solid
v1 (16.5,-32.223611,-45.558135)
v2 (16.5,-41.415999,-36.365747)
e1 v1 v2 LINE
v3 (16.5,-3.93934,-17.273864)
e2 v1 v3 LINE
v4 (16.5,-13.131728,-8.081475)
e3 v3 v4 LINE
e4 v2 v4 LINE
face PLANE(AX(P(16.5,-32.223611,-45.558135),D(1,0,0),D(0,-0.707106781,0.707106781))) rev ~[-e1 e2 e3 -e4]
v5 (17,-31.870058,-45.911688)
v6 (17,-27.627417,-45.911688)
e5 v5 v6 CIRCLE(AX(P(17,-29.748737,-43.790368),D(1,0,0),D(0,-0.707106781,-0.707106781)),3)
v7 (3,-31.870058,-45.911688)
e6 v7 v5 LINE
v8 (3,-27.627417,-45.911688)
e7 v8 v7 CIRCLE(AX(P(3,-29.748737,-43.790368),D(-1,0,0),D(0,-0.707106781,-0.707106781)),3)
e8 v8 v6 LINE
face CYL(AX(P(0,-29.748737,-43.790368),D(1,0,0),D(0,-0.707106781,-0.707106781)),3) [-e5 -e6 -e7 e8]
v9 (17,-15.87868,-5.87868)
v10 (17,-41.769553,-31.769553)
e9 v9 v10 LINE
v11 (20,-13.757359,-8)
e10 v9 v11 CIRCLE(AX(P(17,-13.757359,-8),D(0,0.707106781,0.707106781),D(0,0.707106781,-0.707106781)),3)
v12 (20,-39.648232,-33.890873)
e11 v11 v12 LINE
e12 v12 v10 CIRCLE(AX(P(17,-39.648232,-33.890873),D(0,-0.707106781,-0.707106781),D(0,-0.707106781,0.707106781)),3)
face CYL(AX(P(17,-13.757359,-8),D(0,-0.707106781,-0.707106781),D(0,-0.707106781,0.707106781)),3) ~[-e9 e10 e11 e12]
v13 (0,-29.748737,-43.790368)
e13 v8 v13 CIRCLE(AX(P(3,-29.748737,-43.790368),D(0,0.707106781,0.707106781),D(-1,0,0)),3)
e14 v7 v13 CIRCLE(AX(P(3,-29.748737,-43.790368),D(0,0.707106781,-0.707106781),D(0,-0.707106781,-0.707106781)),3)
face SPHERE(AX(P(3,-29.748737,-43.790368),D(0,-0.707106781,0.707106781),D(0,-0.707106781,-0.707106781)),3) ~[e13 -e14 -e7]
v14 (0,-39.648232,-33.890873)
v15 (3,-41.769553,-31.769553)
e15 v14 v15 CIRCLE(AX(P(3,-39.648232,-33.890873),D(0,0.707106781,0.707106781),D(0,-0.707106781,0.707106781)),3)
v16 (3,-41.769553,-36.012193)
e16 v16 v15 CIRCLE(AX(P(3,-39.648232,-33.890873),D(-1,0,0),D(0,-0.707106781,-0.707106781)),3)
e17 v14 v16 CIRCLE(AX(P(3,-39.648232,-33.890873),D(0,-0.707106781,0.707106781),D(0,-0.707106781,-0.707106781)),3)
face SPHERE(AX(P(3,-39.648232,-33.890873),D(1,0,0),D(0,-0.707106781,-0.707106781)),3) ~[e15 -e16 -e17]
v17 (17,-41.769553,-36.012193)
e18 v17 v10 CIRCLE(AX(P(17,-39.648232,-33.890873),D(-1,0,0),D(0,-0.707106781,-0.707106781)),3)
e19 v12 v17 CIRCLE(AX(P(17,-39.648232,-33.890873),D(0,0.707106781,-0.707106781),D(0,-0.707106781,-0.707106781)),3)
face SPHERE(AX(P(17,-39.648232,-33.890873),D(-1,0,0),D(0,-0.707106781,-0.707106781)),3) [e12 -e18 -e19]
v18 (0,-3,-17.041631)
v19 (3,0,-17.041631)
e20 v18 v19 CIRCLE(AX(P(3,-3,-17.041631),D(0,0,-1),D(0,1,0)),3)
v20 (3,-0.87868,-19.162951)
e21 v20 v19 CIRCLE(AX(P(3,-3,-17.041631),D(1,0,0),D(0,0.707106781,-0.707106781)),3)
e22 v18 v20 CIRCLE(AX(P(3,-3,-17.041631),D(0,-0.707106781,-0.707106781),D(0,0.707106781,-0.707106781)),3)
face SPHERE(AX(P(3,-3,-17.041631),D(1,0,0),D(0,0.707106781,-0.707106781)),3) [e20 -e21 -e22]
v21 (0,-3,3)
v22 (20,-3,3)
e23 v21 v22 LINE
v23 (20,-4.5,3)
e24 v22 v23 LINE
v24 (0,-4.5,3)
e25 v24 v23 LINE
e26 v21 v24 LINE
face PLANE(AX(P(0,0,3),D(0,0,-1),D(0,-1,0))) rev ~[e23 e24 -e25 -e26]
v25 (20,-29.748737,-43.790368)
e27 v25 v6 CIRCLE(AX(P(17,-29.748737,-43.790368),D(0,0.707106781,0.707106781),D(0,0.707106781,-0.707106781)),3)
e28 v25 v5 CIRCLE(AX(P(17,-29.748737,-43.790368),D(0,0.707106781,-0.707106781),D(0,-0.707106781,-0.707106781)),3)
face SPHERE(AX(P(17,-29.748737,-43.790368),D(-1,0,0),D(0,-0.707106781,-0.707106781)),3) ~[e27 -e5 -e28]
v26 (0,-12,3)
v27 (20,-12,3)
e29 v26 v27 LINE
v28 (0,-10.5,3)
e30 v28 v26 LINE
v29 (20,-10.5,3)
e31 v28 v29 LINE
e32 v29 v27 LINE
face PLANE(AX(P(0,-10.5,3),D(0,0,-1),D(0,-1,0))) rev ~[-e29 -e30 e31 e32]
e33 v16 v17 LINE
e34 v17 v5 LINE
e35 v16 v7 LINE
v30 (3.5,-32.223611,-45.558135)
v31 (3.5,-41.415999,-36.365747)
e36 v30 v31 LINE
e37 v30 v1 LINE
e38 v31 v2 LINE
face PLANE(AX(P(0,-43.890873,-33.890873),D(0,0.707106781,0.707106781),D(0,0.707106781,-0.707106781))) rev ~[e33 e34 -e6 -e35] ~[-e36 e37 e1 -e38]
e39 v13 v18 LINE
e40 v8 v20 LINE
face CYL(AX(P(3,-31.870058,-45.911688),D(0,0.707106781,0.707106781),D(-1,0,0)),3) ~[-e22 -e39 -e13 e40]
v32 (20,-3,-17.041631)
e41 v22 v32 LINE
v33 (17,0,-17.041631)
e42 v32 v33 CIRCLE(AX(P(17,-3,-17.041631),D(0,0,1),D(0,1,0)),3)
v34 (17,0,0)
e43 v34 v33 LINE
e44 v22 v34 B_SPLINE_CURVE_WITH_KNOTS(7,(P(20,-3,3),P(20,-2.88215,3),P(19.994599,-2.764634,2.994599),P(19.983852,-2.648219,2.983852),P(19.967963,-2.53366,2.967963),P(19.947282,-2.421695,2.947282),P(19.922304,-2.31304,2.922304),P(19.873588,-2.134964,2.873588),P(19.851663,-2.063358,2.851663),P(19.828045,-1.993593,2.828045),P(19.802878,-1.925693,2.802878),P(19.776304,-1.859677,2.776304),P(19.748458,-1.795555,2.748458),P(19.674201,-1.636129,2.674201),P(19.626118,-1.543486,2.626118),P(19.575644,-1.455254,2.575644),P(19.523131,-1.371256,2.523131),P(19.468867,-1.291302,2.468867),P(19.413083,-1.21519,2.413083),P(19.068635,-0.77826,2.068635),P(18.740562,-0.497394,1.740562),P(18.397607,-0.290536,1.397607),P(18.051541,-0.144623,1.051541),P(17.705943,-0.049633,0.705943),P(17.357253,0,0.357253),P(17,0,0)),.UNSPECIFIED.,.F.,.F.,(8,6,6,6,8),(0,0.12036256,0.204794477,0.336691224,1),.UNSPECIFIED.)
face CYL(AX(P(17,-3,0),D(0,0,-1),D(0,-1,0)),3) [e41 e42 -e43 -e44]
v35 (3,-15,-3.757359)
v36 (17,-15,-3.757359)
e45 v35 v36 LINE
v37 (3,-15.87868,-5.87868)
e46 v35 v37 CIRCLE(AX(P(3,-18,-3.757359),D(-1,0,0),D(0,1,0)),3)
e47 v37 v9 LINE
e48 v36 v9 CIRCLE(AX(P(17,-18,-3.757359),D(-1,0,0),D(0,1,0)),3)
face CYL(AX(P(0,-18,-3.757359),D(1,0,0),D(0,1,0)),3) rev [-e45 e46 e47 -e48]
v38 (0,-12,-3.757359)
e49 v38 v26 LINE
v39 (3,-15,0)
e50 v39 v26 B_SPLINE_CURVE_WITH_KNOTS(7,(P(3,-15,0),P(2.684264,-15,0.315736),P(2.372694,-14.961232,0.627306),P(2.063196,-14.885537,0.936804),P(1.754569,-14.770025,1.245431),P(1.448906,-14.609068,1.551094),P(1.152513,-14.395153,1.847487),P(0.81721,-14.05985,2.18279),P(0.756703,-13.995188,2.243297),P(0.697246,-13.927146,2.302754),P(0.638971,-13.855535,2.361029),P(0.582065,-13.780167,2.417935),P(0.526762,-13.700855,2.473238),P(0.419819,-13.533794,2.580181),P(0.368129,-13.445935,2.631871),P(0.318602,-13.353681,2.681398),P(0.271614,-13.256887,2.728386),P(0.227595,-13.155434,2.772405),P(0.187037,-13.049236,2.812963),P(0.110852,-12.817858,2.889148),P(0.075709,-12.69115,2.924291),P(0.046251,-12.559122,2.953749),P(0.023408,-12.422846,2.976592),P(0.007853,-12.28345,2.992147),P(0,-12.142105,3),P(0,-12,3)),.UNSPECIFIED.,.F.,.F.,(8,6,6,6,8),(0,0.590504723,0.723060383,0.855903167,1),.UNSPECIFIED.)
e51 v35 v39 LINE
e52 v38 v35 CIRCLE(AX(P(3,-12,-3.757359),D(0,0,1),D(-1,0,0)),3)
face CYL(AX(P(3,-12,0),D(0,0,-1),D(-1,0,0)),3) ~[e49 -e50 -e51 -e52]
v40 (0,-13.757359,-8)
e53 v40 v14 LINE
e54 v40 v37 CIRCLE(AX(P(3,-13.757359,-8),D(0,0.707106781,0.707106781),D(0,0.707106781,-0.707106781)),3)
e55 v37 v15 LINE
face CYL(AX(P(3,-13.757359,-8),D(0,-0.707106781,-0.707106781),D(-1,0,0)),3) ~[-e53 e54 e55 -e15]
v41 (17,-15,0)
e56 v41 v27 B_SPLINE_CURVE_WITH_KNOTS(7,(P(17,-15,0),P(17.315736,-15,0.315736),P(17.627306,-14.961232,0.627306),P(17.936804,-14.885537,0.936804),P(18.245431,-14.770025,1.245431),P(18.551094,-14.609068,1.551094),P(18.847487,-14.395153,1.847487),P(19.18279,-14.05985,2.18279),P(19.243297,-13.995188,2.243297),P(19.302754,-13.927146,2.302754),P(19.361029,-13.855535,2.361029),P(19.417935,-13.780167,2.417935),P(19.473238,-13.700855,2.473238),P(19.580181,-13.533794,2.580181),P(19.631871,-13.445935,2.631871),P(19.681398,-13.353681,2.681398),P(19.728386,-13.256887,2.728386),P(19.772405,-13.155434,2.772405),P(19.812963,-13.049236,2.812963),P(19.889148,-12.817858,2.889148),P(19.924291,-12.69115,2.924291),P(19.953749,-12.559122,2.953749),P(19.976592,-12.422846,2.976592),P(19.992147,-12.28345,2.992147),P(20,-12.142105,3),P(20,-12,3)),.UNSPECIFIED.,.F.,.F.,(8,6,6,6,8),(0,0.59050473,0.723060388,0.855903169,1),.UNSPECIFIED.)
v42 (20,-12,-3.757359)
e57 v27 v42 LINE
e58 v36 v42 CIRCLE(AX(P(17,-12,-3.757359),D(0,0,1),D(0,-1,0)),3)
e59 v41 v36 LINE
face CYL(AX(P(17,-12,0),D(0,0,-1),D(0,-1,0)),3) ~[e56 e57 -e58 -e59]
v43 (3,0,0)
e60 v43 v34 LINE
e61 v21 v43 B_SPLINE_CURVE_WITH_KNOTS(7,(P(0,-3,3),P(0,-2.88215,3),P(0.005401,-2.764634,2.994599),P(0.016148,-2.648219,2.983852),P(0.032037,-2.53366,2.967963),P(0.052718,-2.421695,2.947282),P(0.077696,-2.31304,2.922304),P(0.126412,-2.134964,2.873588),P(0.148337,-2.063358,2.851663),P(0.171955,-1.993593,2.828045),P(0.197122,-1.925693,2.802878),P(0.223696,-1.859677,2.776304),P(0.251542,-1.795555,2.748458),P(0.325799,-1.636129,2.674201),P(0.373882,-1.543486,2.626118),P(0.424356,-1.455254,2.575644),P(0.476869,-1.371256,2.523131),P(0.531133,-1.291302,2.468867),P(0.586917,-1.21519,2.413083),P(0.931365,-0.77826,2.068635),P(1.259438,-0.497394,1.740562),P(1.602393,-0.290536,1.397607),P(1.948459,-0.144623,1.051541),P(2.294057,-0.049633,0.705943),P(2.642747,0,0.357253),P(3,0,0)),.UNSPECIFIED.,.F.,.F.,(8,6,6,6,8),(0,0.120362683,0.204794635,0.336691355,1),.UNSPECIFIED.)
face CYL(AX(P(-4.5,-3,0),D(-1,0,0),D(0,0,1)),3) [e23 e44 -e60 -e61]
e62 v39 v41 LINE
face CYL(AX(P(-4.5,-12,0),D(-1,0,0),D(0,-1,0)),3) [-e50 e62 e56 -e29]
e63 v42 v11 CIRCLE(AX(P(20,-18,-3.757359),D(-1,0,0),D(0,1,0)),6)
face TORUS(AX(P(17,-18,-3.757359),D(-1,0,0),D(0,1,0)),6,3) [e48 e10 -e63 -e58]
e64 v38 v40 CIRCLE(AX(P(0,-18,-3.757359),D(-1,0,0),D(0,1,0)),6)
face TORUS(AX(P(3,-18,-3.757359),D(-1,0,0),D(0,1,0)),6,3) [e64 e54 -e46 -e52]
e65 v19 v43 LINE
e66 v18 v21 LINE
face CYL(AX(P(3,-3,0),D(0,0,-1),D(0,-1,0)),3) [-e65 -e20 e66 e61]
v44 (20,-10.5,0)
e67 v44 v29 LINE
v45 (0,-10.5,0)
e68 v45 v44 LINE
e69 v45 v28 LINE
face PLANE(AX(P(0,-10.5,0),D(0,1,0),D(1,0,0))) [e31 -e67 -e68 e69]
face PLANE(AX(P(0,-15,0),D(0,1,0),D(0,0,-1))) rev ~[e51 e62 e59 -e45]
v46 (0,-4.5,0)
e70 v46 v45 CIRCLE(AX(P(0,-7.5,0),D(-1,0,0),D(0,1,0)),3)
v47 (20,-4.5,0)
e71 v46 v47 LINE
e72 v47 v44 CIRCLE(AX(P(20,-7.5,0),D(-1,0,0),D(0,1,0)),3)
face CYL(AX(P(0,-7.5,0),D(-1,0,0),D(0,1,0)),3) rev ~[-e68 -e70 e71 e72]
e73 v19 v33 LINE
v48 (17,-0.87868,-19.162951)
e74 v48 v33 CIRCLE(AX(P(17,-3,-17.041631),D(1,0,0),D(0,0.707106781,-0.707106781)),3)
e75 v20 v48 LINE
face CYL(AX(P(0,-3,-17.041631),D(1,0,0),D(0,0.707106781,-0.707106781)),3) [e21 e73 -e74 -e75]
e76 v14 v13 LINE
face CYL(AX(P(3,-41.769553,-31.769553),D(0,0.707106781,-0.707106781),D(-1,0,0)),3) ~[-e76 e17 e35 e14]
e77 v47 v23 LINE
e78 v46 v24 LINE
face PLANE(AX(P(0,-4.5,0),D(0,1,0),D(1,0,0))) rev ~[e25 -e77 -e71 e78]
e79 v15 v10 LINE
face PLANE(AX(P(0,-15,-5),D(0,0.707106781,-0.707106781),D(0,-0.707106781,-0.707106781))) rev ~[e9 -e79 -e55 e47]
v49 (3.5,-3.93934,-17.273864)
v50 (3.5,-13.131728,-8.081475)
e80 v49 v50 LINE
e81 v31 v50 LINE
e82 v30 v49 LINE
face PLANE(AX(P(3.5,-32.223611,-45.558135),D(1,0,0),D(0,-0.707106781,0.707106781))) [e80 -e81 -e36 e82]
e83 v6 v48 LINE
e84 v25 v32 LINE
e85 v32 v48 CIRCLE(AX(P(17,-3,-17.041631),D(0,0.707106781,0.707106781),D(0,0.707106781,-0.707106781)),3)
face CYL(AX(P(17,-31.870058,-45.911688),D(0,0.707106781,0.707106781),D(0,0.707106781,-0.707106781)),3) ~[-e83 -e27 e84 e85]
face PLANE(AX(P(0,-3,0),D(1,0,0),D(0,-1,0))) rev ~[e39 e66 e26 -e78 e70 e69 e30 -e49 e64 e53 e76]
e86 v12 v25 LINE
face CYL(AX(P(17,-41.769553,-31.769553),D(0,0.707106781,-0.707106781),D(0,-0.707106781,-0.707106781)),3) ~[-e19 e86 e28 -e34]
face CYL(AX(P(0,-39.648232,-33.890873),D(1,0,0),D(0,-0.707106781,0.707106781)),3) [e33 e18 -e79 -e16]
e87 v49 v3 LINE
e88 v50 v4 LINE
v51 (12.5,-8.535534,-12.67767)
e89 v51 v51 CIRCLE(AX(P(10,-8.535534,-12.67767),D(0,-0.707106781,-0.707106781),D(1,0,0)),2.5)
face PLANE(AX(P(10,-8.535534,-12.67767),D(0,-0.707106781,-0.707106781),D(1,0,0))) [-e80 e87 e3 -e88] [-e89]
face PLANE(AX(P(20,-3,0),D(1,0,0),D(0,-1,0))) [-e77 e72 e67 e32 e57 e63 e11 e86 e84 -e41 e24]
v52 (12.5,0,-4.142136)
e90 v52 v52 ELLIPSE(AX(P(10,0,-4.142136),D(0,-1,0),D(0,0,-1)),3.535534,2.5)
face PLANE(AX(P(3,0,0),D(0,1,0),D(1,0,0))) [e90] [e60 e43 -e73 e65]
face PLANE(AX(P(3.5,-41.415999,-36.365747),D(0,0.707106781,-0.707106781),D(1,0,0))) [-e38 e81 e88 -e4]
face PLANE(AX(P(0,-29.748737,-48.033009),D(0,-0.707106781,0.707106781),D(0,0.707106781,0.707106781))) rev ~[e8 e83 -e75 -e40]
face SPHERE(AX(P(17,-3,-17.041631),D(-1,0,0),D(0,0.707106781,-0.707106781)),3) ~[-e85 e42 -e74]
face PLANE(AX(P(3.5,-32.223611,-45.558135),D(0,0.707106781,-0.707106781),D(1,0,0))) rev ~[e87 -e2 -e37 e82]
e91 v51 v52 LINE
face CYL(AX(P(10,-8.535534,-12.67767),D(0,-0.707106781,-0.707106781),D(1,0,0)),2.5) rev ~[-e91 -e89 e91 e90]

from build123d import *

# Parameters (mm, degrees)
F1_DEPTH    = 20
F2_W        = 13
F2_H        = 13
F3_DEPTH    = 40
F4_R        = 2.5
F5_REACH    = 22.0720678119
F6_F1_R     = 3
F6_F2_R     = 3
F7_DEPTH    = 3
F8_T1_DEPTH = 29


# Not quite as in the source:
# - a fillet or chamfer that OpenCascade refuses, or shapes differently, is made with other operations: its cross-section is extruded or revolved along the edge and cut away or added


with BuildPart() as f1:
    # F0 (on Right) → F1 (new body)
    with BuildSketch(Plane.YZ):
        with BuildLine():
            Line((0, -18.2842712475), (0, 0))
            Line((0, 0), (-4.5, 0))
            ThreePointArc((-4.5, 0), (-7.5, -3), (-10.5, 0))
            Line((-10.5, 0), (-15, 0))
            Line((-15, 0), (-15, -5))
            Line((-15, -5), (-43.8908729653, -33.8908729653))
            Line((-43.8908729653, -33.8908729653), (-29.7487373415, -48.033008589))
            Line((-29.7487373415, -48.033008589), (0, -18.2842712475))
        make_face()
    extrude(amount=F1_DEPTH)

    # F2 (on face) → F3 (cut)
    with BuildSketch(Plane(origin=(0, -38.8908729653, -38.8908729653), x_dir=(1, 0, 0), z_dir=(0, -0.7071067812, -0.7071067812))):
        with Locations((10, -2.9289321881)):
            Rectangle(F2_W, F2_H)
    extrude(amount=-F3_DEPTH, mode=Mode.SUBTRACT)

    f5_end = f1.faces().sort_by_distance((10, 0, -9.1421356237))[0]
    # F4 (on face) → F5 (cut, up to a face of the model that its end follows)
    with BuildSketch(Plane(origin=(0, -10.6066017178, -10.6066017178), x_dir=(1, 0, 0), z_dir=(0, -0.7071067812, -0.7071067812))):
        with Locations((10, -2.9289321881)):
            Circle(F4_R)
    f5_long = extrude(amount=-F5_REACH, mode=Mode.PRIVATE)
    add(split(f5_long, bisect_by=f5_end, keep=Keep.BOTTOM, mode=Mode.PRIVATE), mode=Mode.SUBTRACT)

    # F6: fillet of radius 3 on 12 edges, made by hand

    # F6_f1
    f6_f1_edges = [f1.edges().sort_by_distance(p)[0] for p in [
        (10, -15, -5),
    ]]
    fillet(f6_f1_edges, radius=F6_F1_R)

    # F6_f2
    f6_f2_edges = [f1.edges().sort_by_distance(p)[0] for p in [
        (10, -43.8908729653, -33.8908729653),
        (0, -36.8198051534, -40.9619407771),
        (10, -29.7487373415, -48.033008589),
        (20, -36.8198051534, -40.9619407771),
        (10, 0, -18.2842712475),
        (20, -14.8743686708, -33.1586399182),
        (20, 0, -9.1421356237),
        (20, -15, -1.8786796564),
        (0, -15, -1.8786796564),
        (0, -14.8743686708, -33.1586399182),
        (0, 0, -9.1421356237),
        (0, -15.2283614025, -4.90540961),
        (20, -15.2283614025, -4.90540961),
    ]]
    fillet(f6_f2_edges, radius=F6_F2_R)

    # F7 (add): faces of the model
    f7_faces = [f1.faces().sort_by_distance(p)[0] for p in [
        (10, -2.3208506609, 0),
        (10, -12.6791493391, 0),
    ]]
    extrude(f7_faces, amount=F7_DEPTH)

    # F8: fillet of radius 3 on 2 edges, made by hand

    # F8_s2 → F8_t1 (cut)
    with BuildSketch(Plane.YZ.offset(-4.5)):
        with BuildLine():
            ThreePointArc((-15, 0), (-14.1213203436, 2.1213203436), (-12, 3))
            Line((-12, 3), (-15, 3))
            Line((-15, 3), (-15, 0))
        make_face()
        with BuildLine():
            ThreePointArc((-3, 3), (-0.8786796564, 2.1213203436), (0, 0))
            Line((0, 0), (0, 3))
            Line((0, 3), (-3, 3))
        make_face()
    extrude(amount=F8_T1_DEPTH, mode=Mode.SUBTRACT)


solid = f1.part
